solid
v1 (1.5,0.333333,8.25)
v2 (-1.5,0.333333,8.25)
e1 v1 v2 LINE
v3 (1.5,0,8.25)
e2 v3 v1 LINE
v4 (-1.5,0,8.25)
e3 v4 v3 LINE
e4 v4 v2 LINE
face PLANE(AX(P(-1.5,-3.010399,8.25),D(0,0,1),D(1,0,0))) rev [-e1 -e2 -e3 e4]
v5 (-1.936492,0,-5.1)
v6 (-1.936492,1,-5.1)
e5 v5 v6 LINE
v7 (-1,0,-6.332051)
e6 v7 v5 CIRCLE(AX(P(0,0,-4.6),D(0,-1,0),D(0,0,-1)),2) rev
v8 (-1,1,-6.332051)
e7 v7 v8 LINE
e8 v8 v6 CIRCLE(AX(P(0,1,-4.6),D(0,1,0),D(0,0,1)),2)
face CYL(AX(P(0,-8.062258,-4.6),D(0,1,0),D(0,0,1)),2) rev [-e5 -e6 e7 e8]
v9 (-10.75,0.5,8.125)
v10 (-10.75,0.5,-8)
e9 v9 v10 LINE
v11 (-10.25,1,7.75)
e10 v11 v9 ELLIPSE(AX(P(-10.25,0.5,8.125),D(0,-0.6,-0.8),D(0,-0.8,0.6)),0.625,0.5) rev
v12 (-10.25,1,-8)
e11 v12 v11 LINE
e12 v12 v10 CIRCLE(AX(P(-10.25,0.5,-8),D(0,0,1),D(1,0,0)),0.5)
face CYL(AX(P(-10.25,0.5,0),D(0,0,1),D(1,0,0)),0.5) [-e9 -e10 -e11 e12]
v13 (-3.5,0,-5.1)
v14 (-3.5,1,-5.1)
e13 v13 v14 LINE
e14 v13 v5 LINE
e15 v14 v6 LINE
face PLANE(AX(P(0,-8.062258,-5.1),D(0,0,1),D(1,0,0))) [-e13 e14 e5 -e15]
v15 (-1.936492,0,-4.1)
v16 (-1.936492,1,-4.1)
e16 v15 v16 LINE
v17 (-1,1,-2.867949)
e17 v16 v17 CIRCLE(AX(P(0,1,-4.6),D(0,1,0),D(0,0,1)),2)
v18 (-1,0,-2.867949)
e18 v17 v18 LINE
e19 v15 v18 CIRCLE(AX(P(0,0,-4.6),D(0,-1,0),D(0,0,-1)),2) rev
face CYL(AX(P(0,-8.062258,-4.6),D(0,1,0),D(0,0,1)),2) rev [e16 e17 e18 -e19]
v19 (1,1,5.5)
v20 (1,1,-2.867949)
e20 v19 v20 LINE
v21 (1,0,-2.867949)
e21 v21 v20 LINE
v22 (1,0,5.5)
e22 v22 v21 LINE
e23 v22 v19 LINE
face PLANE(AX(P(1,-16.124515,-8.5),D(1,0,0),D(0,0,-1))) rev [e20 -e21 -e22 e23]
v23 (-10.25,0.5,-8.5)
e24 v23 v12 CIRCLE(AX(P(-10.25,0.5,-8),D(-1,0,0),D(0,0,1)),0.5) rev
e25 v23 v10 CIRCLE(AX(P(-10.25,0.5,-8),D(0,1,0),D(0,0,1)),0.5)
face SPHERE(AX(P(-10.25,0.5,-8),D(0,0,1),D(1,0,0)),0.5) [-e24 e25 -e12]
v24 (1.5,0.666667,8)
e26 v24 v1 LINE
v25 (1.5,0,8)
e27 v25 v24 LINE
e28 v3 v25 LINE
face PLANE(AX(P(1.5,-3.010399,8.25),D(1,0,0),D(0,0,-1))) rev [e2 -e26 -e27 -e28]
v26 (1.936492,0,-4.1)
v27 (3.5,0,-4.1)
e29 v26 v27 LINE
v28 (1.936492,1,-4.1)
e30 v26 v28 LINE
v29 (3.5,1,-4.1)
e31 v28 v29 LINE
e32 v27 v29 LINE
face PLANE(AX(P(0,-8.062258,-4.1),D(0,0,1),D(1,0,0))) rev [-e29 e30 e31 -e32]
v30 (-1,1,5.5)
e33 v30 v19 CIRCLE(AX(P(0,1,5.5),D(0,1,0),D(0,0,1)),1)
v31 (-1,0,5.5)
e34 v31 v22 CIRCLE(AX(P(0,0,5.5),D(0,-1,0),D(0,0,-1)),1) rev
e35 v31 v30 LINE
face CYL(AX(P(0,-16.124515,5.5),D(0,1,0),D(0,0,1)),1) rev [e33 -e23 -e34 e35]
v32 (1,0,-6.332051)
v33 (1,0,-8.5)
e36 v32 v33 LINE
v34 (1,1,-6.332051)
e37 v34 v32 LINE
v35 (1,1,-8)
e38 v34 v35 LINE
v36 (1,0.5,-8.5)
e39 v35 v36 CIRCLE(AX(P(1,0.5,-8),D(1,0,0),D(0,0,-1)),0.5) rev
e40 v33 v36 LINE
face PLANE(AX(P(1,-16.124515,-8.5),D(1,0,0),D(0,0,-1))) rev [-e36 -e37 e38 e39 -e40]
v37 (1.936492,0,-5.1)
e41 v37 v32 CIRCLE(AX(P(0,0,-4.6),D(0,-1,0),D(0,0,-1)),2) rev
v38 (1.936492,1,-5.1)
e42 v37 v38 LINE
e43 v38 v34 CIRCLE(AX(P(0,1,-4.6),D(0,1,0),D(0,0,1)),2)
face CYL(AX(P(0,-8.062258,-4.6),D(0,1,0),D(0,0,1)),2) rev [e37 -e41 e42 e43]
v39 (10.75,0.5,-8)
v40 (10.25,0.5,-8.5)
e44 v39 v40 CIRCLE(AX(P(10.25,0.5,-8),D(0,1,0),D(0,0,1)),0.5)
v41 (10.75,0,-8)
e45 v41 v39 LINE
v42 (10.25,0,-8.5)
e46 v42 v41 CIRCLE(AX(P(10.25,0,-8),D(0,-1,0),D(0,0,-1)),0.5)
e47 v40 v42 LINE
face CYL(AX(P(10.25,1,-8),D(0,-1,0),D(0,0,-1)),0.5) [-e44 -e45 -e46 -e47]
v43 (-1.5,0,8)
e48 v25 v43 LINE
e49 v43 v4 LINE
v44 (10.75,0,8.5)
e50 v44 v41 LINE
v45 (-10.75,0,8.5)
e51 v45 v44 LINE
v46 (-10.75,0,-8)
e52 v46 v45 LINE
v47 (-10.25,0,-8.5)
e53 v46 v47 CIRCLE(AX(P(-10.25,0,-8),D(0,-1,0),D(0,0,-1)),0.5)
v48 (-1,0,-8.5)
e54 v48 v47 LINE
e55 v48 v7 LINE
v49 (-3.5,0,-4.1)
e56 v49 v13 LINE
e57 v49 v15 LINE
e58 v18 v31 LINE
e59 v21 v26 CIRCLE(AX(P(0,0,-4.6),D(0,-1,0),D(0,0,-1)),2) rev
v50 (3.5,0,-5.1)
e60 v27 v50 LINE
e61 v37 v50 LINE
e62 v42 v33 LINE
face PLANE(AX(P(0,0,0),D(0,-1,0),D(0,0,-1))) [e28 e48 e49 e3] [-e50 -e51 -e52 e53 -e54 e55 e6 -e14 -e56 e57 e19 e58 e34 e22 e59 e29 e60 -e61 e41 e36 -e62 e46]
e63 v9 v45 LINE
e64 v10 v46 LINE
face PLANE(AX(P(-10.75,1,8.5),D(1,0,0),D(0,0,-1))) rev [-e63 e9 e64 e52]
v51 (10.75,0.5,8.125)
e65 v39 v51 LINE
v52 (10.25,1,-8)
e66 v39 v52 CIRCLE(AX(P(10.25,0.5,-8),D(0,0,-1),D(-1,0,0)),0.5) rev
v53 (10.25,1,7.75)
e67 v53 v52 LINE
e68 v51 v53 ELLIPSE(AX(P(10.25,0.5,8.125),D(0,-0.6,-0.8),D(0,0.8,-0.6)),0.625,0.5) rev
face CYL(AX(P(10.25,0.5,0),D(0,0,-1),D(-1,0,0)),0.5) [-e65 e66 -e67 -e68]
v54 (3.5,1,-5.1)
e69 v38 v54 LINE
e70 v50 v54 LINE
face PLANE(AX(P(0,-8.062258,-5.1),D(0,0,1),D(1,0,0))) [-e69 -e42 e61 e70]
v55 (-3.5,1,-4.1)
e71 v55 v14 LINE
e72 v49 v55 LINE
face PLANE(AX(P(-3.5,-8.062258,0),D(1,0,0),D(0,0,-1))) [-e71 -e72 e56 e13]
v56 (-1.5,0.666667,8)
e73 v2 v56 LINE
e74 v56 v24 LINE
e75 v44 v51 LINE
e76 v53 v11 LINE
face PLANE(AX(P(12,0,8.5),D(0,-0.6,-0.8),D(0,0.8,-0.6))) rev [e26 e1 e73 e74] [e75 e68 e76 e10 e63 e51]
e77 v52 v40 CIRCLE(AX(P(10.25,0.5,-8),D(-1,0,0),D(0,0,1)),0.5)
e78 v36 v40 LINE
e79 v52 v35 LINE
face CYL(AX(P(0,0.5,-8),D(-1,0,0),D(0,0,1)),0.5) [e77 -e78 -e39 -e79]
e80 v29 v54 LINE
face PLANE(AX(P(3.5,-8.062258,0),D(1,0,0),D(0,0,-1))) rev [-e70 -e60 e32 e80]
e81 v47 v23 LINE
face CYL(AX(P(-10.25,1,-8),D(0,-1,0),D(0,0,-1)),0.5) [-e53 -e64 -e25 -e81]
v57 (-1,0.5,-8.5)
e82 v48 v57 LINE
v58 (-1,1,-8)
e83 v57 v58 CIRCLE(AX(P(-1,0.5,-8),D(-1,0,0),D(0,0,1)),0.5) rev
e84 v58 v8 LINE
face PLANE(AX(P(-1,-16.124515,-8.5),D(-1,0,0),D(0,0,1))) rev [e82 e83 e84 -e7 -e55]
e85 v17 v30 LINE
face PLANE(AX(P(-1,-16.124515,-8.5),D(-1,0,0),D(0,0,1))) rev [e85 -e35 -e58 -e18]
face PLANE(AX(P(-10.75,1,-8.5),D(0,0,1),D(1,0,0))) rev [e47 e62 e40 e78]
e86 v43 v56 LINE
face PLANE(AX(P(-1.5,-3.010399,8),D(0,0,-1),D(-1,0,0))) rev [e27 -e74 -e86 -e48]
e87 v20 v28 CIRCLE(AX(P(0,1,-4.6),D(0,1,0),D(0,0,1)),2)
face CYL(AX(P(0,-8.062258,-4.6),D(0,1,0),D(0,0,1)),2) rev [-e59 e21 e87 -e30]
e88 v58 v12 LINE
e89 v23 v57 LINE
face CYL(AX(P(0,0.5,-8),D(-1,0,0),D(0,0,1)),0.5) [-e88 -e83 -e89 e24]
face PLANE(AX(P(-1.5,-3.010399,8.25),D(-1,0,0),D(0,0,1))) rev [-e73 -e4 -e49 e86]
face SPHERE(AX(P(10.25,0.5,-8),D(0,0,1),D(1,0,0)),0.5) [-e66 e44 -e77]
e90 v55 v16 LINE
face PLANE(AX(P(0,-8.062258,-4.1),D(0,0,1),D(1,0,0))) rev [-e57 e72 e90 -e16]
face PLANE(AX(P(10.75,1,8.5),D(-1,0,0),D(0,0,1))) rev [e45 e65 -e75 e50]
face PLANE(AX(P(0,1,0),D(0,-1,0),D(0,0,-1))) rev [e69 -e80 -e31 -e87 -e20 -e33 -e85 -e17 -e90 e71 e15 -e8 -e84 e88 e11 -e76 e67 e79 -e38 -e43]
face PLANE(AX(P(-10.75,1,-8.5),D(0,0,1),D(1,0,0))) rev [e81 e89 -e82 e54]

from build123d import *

# Parameters (mm, degrees)
SKIZZE1_W                       = 21.5
SKIZZE1_H                       = 17
AUFSATZ_LINEAR_AUSTRAGEN1_DEPTH = 1
VERRUNDUNG1_R                   = 0.5
SCHNITT_LINEAR_AUSTRAGEN1_REACH = 25.141
SKIZZE4_W                       = 3
SKIZZE4_H                       = 0.25
SCHNITT_LINEAR_AUSTRAGEN2_DEPTH = 1
VERRUNDUNG2_R                   = 0.5
SCHNITT_LINEAR_AUSTRAGEN3_DEPTH = 1
SCHNITT_LINEAR_START            = -1
SCHNITT_LINEAR_AUSTRAGEN4_DEPTH = 1


with BuildPart() as part:
    # Skizze1 → Aufsatz-Linear austragen1 (new body)
    with BuildSketch(Plane(origin=(0, 0, 0), x_dir=(1, 0, 0), z_dir=(0, 1, 0))):
        Rectangle(SKIZZE1_W, SKIZZE1_H)
    extrude(amount=AUFSATZ_LINEAR_AUSTRAGEN1_DEPTH)

    # Verrundung1
    verrundung1_edges = [part.edges().sort_by_distance(p)[0] for p in [
        (-10.75, 1, 0),
        (10.75, 1, 0),
        (0, 1, -8.5),
    ]]
    fillet(verrundung1_edges, radius=VERRUNDUNG1_R)

    # Schnitt-Linear austragen1: up to this face of the body (flat: up to its plane)
    schnitt_linear_austragen1_end = Plane(part.part.faces().sort_by_distance((10.75, 0.25, 0))[0])
    # Skizze2 → Schnitt-Linear austragen1 (cut, up to the picked face)
    with BuildSketch(Plane.ZY.offset(10.75), mode=Mode.PRIVATE) as schnitt_linear_austragen1_sk1:
        Polygon((8.5, 0), (7.75, 1), (8.5, 1), align=None)
    schnitt_linear_austragen1_tool1 = split(extrude(schnitt_linear_austragen1_sk1.sketch, amount=-SCHNITT_LINEAR_AUSTRAGEN1_REACH, mode=Mode.PRIVATE), bisect_by=schnitt_linear_austragen1_end, keep=Keep.BOTH, mode=Mode.PRIVATE)
    add(schnitt_linear_austragen1_tool1.solids().sort_by(Axis((-10.75, 0.666667, 8.25), (1, 0, 0)))[0], mode=Mode.SUBTRACT)

    # Skizze4 → Schnitt-Linear austragen2 (cut)
    with BuildSketch(Plane(origin=(0, 1, 0), x_dir=(1, 0, 0), z_dir=(0, 1, 0))):
        with Locations((0, -8.125)):
            Rectangle(SKIZZE4_W, SKIZZE4_H)
    extrude(amount=-SCHNITT_LINEAR_AUSTRAGEN2_DEPTH, mode=Mode.SUBTRACT)

    # Verrundung2
    # the kernel refuses this fillet: 0.5 mm, written as the material it takes off along each edge
    with BuildSketch(Plane(origin=(-10.25, 0.5, -8), x_dir=(0, 0, -1), z_dir=(-1, 0, 0))) as verrundung2_piece_1_section:
        Polygon((0, 0), (VERRUNDUNG2_R, 0), (VERRUNDUNG2_R, -VERRUNDUNG2_R), (0, -VERRUNDUNG2_R), align=None)
    verrundung2_piece_1 = extrude(amount=VERRUNDUNG2_R, mode=Mode.PRIVATE)
    verrundung2_piece_1 = verrundung2_piece_1 - Plane(origin=(-10.25, 0.5, -8), x_dir=(0, -0.7071067811865475, 0.7071067811865475), z_dir=(-1, 0, 0)) * Sphere(VERRUNDUNG2_R, mode=Mode.PRIVATE)
    add(verrundung2_piece_1, mode=Mode.SUBTRACT)
    with BuildSketch(Plane(origin=(10.25, 0.5, -8), x_dir=(0, 0, -1), z_dir=(1, 0, 0))) as verrundung2_piece_2_section:
        Polygon((0, 0), (VERRUNDUNG2_R, 0), (VERRUNDUNG2_R, VERRUNDUNG2_R), (0, VERRUNDUNG2_R), align=None)
    verrundung2_piece_2 = extrude(amount=VERRUNDUNG2_R, mode=Mode.PRIVATE)
    verrundung2_piece_2 = verrundung2_piece_2 - Plane(origin=(10.25, 0.5, -8), x_dir=(0, -0.7071067811865475, 0.7071067811865475), z_dir=(1, 0, 0)) * Sphere(VERRUNDUNG2_R, mode=Mode.PRIVATE)
    add(verrundung2_piece_2, mode=Mode.SUBTRACT)
    with BuildSketch(Plane(origin=(10.75, -1.25, -8.5), x_dir=(0, 0, 1), z_dir=(0, 1, 0))) as verrundung2_piece_3:
        with BuildLine():
            CenterArc((VERRUNDUNG2_R, -VERRUNDUNG2_R), VERRUNDUNG2_R, 90, 90)
            Line((0, -VERRUNDUNG2_R), (0, 0))
            Line((0, 0), (VERRUNDUNG2_R, 0))
        make_face()
    extrude(amount=1.75, mode=Mode.SUBTRACT)
    with BuildSketch(Plane(origin=(-10.75, -1.25, -8.5), x_dir=(0, 0, 1), z_dir=(0, 1, 0))) as verrundung2_piece_4:
        with BuildLine():
            CenterArc((VERRUNDUNG2_R, VERRUNDUNG2_R), VERRUNDUNG2_R, 180, 90)
            Line((0, VERRUNDUNG2_R), (0, 0))
            Line((0, 0), (VERRUNDUNG2_R, 0))
        make_face()
    extrude(amount=1.75, mode=Mode.SUBTRACT)

    # Skizze5 → Schnitt-Linear austragen3 (cut)
    with BuildSketch(Plane(origin=(0, 1, 0), x_dir=(1, 0, 0), z_dir=(0, 1, 0))):
        with BuildLine():
            Line((-3.5, 5.1), (-3.5, 4.1))
            Line((-3.5, 4.1), (-1.936491673, 4.1))
            ThreePointArc((-1.936491673, 4.1), (-2, 4.6), (-1.936491673, 5.1))
            Line((-1.936491673, 5.1), (-3.5, 5.1))
        make_face()
        with BuildLine():
            ThreePointArc((1.936491673, 5.1), (0, 6.6), (-1.936491673, 5.1))
            Line((-1.936491673, 5.1), (1.936491673, 5.1))
        make_face()
        with BuildLine():
            ThreePointArc((-1.936491673, 5.1), (-2, 4.6), (-1.936491673, 4.1))
            Line((-1.936491673, 4.1), (1.936491673, 4.1))
            ThreePointArc((1.936491673, 4.1), (1.984059393, 4.347991415), (2, 4.6))
            ThreePointArc((2, 4.6), (1.984059393, 4.852008585), (1.936491673, 5.1))
            Line((1.936491673, 5.1), (-1.936491673, 5.1))
        make_face()
        with BuildLine():
            Line((1.936491673, 4.1), (-1.936491673, 4.1))
            ThreePointArc((-1.936491673, 4.1), (0, 2.6), (1.936491673, 4.1))
        make_face()
        with BuildLine():
            ThreePointArc((2, 4.6), (1.984059393, 4.347991415), (1.936491673, 4.1))
            Line((1.936491673, 4.1), (3.5, 4.1))
            Line((3.5, 4.1), (3.5, 5.1))
            Line((3.5, 5.1), (1.936491673, 5.1))
            ThreePointArc((1.936491673, 5.1), (1.984059393, 4.852008585), (2, 4.6))
        make_face()
    extrude(amount=-SCHNITT_LINEAR_AUSTRAGEN3_DEPTH, mode=Mode.SUBTRACT)

    # Skizze6 → Schnitt-Linear austragen4 (cut)
    with BuildSketch(Plane(origin=(0, 1, 0), x_dir=(1, 0, 0), z_dir=(0, 1, 0)).offset(SCHNITT_LINEAR_START)):
        with BuildLine():
            Line((1, 8.5), (1, -5.5))
            ThreePointArc((1, -5.5), (0, -6.5), (-1, -5.5))
            Line((-1, -5.5), (-1, 8.5))
            ThreePointArc((-1, 8.5), (0, 9.5), (1, 8.5))
        make_face()
    extrude(amount=SCHNITT_LINEAR_AUSTRAGEN4_DEPTH, mode=Mode.SUBTRACT)


solid = part.part
